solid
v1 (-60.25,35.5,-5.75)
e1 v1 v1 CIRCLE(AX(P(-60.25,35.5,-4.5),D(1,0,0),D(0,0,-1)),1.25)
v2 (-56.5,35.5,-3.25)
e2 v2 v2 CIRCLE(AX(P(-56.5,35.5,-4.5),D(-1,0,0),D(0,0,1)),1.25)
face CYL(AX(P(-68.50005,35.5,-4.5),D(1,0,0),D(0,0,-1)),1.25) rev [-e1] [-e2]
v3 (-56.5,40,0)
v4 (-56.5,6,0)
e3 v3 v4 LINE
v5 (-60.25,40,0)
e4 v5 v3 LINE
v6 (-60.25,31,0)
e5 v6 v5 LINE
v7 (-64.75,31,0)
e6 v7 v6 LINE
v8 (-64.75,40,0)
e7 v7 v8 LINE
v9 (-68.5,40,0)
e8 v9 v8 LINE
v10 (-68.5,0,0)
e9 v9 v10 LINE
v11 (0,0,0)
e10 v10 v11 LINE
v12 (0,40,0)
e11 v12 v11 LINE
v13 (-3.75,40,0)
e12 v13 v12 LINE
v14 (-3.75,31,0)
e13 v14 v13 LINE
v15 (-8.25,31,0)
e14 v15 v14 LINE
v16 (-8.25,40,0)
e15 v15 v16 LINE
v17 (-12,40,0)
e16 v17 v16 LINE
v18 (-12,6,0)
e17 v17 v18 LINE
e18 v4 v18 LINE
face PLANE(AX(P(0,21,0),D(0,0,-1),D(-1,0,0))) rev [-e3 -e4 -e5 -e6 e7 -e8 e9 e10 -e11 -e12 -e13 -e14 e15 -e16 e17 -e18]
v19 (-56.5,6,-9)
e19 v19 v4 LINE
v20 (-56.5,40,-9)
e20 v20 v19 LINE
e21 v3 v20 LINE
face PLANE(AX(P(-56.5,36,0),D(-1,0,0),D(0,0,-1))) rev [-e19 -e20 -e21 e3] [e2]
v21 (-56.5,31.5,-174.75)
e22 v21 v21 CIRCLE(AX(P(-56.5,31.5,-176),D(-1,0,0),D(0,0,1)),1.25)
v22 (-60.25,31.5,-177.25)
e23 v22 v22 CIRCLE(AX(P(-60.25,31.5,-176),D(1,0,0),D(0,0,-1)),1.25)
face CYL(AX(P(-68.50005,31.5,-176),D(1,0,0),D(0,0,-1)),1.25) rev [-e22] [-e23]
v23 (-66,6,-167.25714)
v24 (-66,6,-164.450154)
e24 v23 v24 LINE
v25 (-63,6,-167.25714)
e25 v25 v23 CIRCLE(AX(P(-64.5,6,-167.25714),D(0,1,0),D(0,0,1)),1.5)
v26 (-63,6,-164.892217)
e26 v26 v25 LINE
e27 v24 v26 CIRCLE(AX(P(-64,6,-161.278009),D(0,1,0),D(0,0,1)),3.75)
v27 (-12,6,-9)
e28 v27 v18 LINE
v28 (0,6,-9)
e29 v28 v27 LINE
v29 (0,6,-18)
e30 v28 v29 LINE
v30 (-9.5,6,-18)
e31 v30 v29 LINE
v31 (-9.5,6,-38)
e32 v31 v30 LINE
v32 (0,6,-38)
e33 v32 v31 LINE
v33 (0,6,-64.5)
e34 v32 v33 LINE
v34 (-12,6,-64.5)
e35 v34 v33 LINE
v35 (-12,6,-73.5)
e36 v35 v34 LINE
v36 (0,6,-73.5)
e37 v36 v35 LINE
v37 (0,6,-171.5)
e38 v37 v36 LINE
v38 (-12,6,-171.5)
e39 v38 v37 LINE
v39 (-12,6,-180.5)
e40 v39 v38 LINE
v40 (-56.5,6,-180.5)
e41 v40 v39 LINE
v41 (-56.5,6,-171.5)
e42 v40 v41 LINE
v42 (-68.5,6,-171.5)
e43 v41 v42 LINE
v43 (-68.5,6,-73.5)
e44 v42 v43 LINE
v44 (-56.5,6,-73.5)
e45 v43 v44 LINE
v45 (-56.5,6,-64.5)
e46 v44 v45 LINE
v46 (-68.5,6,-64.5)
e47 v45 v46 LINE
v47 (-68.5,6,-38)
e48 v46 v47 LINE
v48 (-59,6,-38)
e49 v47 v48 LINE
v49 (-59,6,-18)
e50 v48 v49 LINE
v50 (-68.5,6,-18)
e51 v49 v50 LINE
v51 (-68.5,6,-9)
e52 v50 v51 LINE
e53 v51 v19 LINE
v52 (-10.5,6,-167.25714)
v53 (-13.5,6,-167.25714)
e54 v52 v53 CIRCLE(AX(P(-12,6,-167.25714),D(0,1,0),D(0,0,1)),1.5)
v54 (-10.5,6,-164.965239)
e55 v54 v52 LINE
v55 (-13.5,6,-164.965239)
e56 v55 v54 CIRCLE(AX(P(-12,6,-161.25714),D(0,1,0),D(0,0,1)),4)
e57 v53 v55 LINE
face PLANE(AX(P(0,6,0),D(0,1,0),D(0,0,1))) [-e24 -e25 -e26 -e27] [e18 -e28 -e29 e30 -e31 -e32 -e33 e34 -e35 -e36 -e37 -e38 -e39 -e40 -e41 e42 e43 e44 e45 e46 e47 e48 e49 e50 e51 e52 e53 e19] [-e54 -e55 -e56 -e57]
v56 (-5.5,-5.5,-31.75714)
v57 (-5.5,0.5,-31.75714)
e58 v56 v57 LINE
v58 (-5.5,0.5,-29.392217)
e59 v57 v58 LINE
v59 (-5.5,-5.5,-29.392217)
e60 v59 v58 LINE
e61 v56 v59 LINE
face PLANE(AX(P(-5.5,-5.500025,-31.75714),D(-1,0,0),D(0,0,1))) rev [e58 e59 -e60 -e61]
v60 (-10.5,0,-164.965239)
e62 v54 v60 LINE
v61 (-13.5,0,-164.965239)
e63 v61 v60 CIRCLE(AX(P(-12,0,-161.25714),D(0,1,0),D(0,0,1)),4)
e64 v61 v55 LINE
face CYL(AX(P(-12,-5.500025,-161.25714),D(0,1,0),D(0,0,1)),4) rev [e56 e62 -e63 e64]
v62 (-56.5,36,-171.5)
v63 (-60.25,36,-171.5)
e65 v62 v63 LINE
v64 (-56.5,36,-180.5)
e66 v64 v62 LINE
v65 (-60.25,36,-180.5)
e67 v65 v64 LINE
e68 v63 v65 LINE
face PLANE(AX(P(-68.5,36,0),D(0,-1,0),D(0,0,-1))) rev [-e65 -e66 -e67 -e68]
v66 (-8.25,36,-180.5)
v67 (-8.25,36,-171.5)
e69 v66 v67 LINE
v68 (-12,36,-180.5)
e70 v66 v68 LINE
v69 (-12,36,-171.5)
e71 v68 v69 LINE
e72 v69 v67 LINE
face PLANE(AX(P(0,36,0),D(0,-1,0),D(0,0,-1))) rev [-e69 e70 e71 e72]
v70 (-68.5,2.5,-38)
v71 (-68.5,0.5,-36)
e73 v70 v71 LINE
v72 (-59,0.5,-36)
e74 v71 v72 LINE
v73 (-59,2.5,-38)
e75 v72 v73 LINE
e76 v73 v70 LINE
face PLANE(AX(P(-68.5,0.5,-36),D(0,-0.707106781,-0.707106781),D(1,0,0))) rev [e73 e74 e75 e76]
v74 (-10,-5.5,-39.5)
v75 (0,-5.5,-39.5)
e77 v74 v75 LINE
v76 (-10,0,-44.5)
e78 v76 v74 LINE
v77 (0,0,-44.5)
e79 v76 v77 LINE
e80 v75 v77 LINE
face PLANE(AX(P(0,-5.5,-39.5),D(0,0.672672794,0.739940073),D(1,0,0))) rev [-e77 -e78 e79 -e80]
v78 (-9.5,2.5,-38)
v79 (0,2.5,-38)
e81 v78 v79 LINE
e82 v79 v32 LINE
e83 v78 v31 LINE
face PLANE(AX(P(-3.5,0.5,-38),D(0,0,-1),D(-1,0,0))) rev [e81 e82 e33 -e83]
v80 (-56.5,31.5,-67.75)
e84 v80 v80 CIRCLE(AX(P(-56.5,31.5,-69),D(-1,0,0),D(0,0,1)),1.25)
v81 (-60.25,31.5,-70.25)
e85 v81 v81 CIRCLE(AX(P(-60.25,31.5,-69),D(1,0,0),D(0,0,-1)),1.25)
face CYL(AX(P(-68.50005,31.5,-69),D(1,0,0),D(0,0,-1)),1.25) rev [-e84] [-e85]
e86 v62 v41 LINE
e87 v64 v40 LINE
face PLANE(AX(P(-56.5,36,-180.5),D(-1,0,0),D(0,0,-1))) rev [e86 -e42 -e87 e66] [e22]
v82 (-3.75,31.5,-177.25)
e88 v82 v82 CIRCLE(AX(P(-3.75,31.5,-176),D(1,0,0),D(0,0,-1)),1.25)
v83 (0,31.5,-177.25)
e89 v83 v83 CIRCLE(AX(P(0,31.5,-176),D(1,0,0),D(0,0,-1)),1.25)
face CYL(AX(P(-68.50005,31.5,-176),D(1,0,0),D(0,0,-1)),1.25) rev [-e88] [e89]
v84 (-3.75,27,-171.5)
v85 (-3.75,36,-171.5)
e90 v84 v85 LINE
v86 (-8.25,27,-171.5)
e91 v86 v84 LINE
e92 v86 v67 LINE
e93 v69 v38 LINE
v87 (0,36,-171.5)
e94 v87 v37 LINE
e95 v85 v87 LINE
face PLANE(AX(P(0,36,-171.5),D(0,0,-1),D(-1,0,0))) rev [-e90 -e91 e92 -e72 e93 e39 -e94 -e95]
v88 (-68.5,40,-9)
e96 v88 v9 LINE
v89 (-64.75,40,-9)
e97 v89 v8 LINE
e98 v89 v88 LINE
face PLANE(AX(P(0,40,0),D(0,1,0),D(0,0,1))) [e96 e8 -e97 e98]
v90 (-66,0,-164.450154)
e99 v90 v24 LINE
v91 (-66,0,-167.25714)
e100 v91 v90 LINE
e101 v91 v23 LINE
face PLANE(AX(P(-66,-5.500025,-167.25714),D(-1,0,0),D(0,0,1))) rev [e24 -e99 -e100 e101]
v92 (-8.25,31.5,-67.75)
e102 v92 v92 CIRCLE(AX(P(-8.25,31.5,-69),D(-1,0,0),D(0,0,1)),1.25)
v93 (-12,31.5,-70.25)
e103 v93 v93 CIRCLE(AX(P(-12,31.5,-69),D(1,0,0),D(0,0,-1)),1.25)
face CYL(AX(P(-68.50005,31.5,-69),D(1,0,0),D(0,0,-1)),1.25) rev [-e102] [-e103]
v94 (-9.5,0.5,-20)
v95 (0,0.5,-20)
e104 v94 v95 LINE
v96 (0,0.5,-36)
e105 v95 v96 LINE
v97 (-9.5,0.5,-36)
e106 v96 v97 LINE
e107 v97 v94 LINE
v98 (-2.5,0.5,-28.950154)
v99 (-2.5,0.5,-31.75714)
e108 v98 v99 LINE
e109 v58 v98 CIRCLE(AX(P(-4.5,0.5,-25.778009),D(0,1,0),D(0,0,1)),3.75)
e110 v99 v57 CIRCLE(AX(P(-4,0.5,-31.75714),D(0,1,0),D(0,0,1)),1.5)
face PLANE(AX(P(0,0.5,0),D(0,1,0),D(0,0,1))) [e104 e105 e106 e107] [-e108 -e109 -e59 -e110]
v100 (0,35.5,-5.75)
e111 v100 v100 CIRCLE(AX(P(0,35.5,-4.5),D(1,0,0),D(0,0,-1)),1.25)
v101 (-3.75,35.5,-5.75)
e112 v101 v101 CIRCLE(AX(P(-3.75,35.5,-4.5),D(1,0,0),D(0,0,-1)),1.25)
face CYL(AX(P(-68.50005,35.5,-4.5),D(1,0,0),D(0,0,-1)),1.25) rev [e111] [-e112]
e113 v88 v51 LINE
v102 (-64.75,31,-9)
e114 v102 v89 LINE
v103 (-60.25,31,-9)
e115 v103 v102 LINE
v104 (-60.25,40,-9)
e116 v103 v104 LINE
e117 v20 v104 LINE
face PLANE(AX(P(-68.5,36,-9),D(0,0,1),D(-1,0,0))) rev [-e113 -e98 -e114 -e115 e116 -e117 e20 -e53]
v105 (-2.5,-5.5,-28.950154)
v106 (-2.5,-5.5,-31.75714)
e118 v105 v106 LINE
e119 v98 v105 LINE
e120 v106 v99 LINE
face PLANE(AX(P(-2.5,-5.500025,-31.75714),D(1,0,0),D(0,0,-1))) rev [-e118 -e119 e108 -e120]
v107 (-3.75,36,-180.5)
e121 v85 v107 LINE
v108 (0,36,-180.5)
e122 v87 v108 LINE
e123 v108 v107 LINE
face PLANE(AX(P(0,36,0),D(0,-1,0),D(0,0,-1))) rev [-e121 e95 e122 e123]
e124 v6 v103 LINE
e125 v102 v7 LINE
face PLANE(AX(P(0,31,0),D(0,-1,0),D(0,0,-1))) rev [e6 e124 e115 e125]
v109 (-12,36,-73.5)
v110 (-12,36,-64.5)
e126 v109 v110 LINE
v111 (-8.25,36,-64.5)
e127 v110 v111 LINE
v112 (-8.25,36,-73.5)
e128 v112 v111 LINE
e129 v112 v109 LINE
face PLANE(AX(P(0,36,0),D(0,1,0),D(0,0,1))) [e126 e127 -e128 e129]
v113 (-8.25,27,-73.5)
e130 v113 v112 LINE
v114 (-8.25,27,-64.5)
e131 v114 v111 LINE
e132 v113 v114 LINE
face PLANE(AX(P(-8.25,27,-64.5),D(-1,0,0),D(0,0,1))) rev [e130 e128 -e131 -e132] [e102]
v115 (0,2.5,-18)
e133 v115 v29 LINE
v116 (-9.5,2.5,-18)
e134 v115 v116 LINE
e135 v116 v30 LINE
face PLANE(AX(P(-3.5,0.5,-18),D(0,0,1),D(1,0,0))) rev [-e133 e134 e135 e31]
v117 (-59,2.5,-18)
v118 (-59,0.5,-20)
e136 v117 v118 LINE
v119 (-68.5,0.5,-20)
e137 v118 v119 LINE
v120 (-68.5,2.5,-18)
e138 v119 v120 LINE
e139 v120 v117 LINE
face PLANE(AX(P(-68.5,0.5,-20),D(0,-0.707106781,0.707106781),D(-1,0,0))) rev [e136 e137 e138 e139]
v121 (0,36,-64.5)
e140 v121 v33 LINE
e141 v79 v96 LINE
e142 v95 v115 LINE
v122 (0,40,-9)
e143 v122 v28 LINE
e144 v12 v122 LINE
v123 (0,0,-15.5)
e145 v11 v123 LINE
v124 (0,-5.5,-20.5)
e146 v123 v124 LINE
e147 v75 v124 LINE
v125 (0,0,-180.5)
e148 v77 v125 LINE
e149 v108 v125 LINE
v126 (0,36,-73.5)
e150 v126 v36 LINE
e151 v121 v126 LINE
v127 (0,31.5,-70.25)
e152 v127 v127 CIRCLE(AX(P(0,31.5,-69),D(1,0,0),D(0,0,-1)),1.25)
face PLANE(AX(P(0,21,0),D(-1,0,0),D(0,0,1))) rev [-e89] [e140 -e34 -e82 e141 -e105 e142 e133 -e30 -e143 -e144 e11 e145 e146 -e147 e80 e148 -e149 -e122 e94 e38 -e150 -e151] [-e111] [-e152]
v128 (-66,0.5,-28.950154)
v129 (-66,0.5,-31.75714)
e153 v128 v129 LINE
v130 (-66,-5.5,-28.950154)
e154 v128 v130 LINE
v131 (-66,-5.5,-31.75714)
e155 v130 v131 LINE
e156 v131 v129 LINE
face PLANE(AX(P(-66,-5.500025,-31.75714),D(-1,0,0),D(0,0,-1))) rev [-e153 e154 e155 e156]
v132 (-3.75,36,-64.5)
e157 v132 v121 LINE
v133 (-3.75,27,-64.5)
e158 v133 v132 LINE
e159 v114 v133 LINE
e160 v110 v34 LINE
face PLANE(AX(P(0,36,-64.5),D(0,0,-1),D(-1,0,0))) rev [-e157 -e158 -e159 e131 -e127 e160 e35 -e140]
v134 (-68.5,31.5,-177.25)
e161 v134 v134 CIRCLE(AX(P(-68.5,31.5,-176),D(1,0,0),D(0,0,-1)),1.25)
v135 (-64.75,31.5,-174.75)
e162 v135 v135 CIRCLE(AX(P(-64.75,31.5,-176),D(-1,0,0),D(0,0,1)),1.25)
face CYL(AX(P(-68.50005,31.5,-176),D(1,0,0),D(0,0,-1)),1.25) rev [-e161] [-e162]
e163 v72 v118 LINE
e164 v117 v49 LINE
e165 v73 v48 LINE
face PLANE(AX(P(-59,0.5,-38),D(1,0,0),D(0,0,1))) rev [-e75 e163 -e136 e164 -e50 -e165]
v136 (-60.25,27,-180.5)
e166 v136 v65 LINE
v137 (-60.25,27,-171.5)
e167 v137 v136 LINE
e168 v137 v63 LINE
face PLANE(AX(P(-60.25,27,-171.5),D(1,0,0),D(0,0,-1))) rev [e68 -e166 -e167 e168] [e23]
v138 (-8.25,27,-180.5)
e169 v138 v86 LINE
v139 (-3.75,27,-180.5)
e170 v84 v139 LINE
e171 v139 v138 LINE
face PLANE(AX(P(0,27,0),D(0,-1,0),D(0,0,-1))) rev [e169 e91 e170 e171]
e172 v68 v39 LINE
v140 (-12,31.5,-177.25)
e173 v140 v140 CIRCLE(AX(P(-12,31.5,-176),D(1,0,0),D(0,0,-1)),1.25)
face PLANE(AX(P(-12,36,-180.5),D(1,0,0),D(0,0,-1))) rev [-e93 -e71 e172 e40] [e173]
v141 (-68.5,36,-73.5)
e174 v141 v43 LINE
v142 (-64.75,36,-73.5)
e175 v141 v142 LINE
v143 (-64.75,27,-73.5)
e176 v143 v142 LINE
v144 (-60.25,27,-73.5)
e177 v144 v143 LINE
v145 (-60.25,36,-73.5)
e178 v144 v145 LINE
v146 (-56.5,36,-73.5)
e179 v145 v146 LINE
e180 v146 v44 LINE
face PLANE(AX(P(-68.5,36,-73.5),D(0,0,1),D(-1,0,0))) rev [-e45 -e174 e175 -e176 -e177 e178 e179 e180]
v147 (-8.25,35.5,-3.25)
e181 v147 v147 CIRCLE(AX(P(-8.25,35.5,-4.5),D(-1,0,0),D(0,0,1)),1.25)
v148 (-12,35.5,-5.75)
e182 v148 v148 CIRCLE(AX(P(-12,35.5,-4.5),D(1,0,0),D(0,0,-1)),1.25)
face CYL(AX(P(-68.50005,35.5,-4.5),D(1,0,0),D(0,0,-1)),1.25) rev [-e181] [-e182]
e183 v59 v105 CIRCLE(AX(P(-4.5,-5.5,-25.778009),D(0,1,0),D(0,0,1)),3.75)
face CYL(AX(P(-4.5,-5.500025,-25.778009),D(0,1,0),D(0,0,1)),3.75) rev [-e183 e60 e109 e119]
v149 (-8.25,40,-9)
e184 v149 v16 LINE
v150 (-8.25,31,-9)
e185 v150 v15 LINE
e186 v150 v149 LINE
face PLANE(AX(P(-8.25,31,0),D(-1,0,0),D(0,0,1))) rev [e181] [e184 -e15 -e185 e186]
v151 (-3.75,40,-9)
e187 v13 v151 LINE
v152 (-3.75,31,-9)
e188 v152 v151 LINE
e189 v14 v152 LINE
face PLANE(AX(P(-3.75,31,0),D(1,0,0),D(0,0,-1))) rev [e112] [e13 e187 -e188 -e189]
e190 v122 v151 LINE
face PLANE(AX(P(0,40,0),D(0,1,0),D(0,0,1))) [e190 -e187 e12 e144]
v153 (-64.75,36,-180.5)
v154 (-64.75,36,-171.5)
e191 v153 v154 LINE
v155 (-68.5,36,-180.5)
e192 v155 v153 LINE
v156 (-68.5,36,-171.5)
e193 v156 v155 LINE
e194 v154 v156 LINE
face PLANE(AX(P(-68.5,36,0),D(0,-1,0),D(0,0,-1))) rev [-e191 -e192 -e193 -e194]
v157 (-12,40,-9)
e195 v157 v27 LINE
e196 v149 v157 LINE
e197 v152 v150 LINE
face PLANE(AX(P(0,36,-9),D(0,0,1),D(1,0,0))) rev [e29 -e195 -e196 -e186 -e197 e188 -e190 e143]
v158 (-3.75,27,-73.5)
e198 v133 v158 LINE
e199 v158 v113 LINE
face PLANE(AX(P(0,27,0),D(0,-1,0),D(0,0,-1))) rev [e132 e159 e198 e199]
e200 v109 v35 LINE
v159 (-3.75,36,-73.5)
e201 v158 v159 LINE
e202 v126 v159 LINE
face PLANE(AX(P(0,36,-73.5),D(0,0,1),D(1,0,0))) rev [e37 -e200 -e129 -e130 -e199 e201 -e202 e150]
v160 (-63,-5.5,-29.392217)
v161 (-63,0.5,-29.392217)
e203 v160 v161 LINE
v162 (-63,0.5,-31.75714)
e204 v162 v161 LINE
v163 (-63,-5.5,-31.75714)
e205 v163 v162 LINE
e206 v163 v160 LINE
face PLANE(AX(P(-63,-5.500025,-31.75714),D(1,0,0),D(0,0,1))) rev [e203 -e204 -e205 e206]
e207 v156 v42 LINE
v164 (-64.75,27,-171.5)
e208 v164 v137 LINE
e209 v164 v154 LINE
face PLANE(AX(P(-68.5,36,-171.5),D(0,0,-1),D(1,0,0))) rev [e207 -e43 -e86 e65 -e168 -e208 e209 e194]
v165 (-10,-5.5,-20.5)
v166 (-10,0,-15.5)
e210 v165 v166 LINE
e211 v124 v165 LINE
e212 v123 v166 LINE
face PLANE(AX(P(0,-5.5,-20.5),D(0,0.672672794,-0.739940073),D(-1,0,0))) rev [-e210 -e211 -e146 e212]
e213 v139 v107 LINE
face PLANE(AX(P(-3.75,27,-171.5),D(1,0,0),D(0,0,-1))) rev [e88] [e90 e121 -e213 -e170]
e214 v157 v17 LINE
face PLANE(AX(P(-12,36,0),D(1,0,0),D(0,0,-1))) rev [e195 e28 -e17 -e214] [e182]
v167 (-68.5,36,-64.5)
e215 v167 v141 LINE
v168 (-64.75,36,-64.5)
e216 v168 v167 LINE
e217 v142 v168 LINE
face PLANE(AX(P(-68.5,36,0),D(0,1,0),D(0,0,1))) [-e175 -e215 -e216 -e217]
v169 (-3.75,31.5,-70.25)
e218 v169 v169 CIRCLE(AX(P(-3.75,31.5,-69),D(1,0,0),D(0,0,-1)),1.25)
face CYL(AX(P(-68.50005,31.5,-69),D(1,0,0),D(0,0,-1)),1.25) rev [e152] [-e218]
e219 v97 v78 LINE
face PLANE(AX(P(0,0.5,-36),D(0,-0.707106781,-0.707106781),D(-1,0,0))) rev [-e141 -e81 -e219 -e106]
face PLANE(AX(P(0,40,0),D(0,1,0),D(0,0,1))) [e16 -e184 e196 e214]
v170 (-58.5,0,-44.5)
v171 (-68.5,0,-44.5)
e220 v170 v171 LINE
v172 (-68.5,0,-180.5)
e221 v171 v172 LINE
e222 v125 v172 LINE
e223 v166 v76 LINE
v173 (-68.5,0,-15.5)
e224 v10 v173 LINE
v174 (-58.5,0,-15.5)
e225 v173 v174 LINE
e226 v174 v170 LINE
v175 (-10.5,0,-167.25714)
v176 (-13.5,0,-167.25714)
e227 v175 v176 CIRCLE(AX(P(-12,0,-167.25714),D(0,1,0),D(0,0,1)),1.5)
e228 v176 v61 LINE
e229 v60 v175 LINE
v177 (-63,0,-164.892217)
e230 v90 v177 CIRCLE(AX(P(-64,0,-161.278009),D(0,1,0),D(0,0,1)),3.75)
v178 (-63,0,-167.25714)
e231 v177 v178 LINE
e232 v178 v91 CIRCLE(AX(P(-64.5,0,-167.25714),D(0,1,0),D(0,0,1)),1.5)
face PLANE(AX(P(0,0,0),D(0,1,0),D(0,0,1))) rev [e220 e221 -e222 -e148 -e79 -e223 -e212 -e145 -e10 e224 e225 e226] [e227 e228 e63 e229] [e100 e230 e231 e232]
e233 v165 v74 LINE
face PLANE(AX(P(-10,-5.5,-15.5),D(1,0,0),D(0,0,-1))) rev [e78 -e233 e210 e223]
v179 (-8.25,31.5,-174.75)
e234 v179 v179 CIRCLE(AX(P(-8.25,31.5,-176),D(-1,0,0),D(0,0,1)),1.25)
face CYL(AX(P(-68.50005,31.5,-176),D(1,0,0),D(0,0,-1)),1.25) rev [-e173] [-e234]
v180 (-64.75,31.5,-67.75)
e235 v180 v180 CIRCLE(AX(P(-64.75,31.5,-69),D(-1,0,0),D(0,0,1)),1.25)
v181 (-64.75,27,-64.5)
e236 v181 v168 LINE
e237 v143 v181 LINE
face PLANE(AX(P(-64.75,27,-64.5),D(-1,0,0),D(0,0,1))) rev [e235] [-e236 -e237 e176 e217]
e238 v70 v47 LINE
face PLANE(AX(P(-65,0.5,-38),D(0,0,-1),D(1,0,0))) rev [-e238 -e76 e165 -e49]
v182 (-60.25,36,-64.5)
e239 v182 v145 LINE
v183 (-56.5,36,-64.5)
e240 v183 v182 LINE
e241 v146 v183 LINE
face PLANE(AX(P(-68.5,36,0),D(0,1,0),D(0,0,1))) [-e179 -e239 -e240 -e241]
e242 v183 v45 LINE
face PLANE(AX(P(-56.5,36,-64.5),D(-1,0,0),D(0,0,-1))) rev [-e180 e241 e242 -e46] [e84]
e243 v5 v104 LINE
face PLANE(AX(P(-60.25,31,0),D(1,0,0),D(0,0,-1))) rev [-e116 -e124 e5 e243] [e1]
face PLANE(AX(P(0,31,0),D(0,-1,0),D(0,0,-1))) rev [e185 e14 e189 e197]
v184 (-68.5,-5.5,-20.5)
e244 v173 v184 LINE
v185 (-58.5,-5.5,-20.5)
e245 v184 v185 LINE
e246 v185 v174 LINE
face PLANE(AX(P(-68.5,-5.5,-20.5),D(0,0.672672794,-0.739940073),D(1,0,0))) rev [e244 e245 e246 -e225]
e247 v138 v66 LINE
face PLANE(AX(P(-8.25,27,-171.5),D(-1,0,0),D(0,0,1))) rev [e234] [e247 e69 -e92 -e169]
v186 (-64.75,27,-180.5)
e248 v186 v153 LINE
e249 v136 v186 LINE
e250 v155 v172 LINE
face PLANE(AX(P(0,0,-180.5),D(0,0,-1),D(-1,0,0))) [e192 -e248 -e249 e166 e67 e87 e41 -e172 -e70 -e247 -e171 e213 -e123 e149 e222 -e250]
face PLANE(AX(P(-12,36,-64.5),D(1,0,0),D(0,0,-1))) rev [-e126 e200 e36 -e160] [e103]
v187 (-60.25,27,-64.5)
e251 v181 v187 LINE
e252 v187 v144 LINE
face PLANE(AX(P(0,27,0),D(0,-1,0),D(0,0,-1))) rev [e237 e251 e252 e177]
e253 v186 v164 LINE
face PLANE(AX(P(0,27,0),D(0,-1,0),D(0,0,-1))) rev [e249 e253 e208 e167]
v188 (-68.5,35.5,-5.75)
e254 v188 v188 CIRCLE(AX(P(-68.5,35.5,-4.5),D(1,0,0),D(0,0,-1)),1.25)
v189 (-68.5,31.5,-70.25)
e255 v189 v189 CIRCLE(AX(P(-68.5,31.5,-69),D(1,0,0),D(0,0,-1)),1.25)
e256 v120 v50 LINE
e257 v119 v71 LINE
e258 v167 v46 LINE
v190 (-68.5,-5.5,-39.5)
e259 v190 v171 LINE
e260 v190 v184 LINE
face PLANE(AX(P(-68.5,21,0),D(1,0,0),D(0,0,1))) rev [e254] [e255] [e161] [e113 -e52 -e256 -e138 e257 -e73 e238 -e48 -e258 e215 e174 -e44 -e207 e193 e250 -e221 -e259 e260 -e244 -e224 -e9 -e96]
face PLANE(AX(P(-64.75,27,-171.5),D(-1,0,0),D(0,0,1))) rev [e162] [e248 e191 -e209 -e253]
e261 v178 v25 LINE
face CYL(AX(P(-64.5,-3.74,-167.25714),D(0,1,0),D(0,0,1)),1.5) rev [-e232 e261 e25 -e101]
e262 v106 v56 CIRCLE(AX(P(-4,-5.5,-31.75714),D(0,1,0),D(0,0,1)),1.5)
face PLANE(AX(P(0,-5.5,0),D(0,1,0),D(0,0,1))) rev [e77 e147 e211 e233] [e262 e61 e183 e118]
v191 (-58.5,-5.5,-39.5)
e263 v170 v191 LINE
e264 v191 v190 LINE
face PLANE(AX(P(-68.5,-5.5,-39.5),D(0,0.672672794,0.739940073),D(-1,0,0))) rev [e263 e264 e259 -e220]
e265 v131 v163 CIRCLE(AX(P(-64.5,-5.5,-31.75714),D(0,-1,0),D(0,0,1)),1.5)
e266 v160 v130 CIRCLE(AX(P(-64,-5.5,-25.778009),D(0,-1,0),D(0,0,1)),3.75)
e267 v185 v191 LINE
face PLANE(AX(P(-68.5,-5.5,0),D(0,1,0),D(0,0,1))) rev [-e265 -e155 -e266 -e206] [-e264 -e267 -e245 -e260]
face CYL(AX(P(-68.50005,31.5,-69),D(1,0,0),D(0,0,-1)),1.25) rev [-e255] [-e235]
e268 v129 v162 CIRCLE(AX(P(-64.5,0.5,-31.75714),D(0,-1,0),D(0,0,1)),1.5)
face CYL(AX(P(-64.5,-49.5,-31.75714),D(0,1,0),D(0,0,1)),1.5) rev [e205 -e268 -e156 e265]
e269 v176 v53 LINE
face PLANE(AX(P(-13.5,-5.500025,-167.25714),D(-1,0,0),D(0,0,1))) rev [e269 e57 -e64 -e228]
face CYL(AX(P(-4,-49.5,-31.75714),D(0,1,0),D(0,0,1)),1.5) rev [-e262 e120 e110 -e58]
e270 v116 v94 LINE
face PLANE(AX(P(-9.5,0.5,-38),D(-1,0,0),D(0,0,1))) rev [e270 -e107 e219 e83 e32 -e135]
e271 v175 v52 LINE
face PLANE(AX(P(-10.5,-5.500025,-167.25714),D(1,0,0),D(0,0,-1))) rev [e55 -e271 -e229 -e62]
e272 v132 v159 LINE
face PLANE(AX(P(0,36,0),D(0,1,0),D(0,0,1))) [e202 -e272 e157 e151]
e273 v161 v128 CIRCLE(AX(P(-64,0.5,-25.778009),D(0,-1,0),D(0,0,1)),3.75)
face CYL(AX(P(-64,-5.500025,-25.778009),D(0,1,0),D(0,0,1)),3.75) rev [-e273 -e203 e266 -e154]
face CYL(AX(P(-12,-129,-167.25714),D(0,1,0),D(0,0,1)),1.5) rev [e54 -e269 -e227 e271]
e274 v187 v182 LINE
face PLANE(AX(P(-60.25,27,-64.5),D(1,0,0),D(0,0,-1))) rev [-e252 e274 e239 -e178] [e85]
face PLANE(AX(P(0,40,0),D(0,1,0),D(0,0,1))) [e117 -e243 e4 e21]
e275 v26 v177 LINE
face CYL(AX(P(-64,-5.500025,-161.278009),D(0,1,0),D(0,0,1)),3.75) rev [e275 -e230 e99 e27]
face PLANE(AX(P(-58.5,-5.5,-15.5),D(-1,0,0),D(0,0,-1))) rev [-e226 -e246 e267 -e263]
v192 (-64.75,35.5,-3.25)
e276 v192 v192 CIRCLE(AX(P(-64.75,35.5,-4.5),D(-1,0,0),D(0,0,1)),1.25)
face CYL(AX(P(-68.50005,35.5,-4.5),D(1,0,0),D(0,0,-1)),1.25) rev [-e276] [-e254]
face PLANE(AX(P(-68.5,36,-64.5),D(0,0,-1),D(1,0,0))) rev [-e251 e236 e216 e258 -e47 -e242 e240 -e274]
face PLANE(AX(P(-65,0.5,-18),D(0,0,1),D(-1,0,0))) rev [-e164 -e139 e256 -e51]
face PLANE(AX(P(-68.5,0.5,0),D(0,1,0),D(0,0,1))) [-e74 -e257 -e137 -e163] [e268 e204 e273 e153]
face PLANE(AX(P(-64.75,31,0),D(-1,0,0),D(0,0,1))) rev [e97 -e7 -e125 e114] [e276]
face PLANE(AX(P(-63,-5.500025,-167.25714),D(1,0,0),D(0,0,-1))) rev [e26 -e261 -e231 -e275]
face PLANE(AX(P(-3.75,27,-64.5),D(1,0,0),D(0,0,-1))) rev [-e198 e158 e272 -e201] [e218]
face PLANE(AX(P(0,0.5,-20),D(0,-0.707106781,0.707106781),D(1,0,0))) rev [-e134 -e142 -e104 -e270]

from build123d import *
from OCP.BRepFilletAPI import BRepFilletAPI_MakeChamfer

# Parameters (mm, degrees)
SKETCH1_W           = 68.5
SKETCH1_H           = 64.5
BOSS_EXTRUDE3_DEPTH = 21
SKETCH3_W           = 61.5
SKETCH3_H           = 61
CUT_EXTRUDE1_DEPTH  = 15
SKETCH5_W           = 68.5
SKETCH5_H           = 6
BOSS_EXTRUDE4_DEPTH = 105
SKETCH10_W          = 10
SKETCH10_H          = 29
BOSS_EXTRUDE5_DEPTH = 5.5
SKETCH9_W           = 3.5
SKETCH9_H           = 20
CUT_EXTRUDE2_DEPTH  = 20.5
SKETCH11_W          = 6
SKETCH11_H          = 20
CUT_EXTRUDE3_DEPTH  = 5.5
CHAMFER2_SIZE       = 5.5
CHAMFER2_SIZE_2     = 5
CHAMFER3_SIZE       = 2
SKETCH12_W          = 34.25
SKETCH12_H          = 169.5
CUT_EXTRUDE4_DEPTH  = 50
SKETCH15_R          = 1.5
CUT_EXTRUDE5_DEPTH  = 50
SKETCH19_W          = 34.25
SKETCH19_H          = 6
BOSS_EXTRUDE6_DEPTH = 11
SKETCH26_W          = 12
SKETCH26_H          = 9
BOSS_EXTRUDE7_DEPTH = 30
SKETCH20_R          = 3.75
CUT_EXTRUDE9_DEPTH  = 188.119113134
SKETCH21_W          = 3
SKETCH21_H          = 2.806985986
CUT_EXTRUDE10_DEPTH = 188.119113134
SKETCH18_R          = 1.5
CUT_EXTRUDE8_DEPTH  = 135
SKETCH24_R          = 4
CUT_EXTRUDE13_DEPTH = 196.377839071
SKETCH25_W          = 3
SKETCH25_H          = 3.218590937
CUT_EXTRUDE14_DEPTH = 196.377839071
SKETCH33_R          = 1.5
CUT_EXTRUDE17_DEPTH = 9.74
SKETCH34_R          = 3.75
CUT_EXTRUDE18_DEPTH = 196.377839071
SKETCH39_W          = 3
SKETCH39_H          = 4.471117771
CUT_EXTRUDE22_DEPTH = 196.377839071
CUT_EXTRUDE23_DEPTH = 15
SKETCH41_W          = 4.5
SKETCH41_H          = 9
CUT_EXTRUDE24_DEPTH = 9
SKETCH42_R          = 1.25
CUT_EXTRUDE25_DEPTH = 197.388645293
SKETCH43_W          = 12
SKETCH43_H          = 9
BOSS_EXTRUDE8_DEPTH = 4
SKETCH44_W          = 4.5
SKETCH44_H          = 9
CUT_EXTRUDE26_DEPTH = 9
SKETCH45_R          = 1.25
CUT_EXTRUDE27_DEPTH = 198.16110164


with BuildPart() as part:
    # Sketch1 → Boss-Extrude3 (new body)
    with BuildSketch(Plane(origin=(0, 0, 0), x_dir=(1, 0, 0), z_dir=(0, 1, 0))):
        with Locations((-34.25, 32.25)):
            Rectangle(SKETCH1_W, SKETCH1_H)
    extrude(amount=BOSS_EXTRUDE3_DEPTH)

    # Sketch3 → Cut-Extrude1 (cut)
    with BuildSketch(Plane(origin=(0, 21, 0), x_dir=(1, 0, 0), z_dir=(0, 1, 0))):
        with Locations((-34.25, 34)):
            Rectangle(SKETCH3_W, SKETCH3_H)
    extrude(amount=-CUT_EXTRUDE1_DEPTH, mode=Mode.SUBTRACT)

    # Sketch5 → Boss-Extrude4 (add)
    with BuildSketch(Plane(origin=(0, 0, -64.5), x_dir=(-1, 0, 0), z_dir=(0, 0, -1))):
        with Locations((34.25, 3)):
            Rectangle(SKETCH5_W, SKETCH5_H)
    extrude(amount=BOSS_EXTRUDE4_DEPTH)

    # Sketch10 → Boss-Extrude5 (add)
    with BuildSketch(Plane.XZ):
        with Locations((-5, -30)):
            Rectangle(SKETCH10_W, SKETCH10_H)
    extrude(amount=BOSS_EXTRUDE5_DEPTH)

    # Sketch9 → Cut-Extrude2 (cut)
    with BuildSketch(Plane(origin=(0, 21, 0), x_dir=(1, 0, 0), z_dir=(0, 1, 0))):
        with Locations((-1.75, 28)):
            Rectangle(SKETCH9_W, SKETCH9_H)
    extrude(amount=-CUT_EXTRUDE2_DEPTH, mode=Mode.SUBTRACT)

    # Sketch11 → Cut-Extrude3 (cut)
    with BuildSketch(Plane(origin=(0, 6, 0), x_dir=(1, 0, 0), z_dir=(0, 1, 0))):
        with Locations((-6.5, 28)):
            Rectangle(SKETCH11_W, SKETCH11_H)
    extrude(amount=-CUT_EXTRUDE3_DEPTH, mode=Mode.SUBTRACT)

    # Chamfer2
    chamfer2_edges_1 = [part.edges().sort_by_distance(p)[0] for p in [
        (-5, -5.5, -44.5),
    ]]
    chamfer2_side_1 = [part.faces().sort_by_distance(p)[0] for p in [
        (-5, -5.4, -44.5),
    ]]
    chamfer2_edges_2 = [part.edges().sort_by_distance(p)[0] for p in [
        (-5, -5.5, -15.5),
    ]]
    chamfer2_side_2 = [part.faces().sort_by_distance(p)[0] for p in [
        (-5, -5.5, -15.6),
    ]]
    chamfer2 = BRepFilletAPI_MakeChamfer(part.part.solid().wrapped)
    for e in chamfer2_edges_1:
        chamfer2.Add(CHAMFER2_SIZE - 0.0001, CHAMFER2_SIZE_2 - 0.0001, e.wrapped, chamfer2_side_1[0].wrapped)
    for e in chamfer2_edges_2:
        chamfer2.Add(CHAMFER2_SIZE_2 - 0.0001, CHAMFER2_SIZE - 0.0001, e.wrapped, chamfer2_side_2[0].wrapped)
    add(Compound.cast(chamfer2.Shape()), mode=Mode.REPLACE)  # a hair under: the kernel refuses the full size

    # Chamfer3
    chamfer3_edges = [part.edges().sort_by_distance(p)[0] for p in [
        (-4.75, 0.5, -38),
        (-4.75, 0.5, -18),
    ]]
    chamfer(chamfer3_edges, length=CHAMFER3_SIZE)

    # Sketch12 → Cut-Extrude4 (cut)
    with BuildSketch(Plane(origin=(0, 21, 0), x_dir=(1, 0, 0), z_dir=(0, 1, 0))):
        with Locations((-51.375, 84.75)):
            Rectangle(SKETCH12_W, SKETCH12_H)
    extrude(amount=-CUT_EXTRUDE4_DEPTH, mode=Mode.SUBTRACT)

    # Sketch15 → Cut-Extrude5 (cut)
    with BuildSketch(Plane(origin=(0, 0.5, 0), x_dir=(1, 0, 0), z_dir=(0, 1, 0))):
        with Locations(Location((-4, 31.75713966, 0), (0, 0, 270))):
            Circle(SKETCH15_R)
    extrude(amount=-CUT_EXTRUDE5_DEPTH, mode=Mode.SUBTRACT)

    # Sketch19 → Boss-Extrude6 (add)
    with BuildSketch(Plane(origin=(0, 0, -169.5), x_dir=(-1, 0, 0), z_dir=(0, 0, -1))):
        with Locations((17.125, 3)):
            Rectangle(SKETCH19_W, SKETCH19_H)
    extrude(amount=BOSS_EXTRUDE6_DEPTH)

    # Sketch26 → Boss-Extrude7 (add)
    with BuildSketch(Plane(origin=(0, 6, 0), x_dir=(1, 0, 0), z_dir=(0, 1, 0))):
        with Locations((-6, 69)):
            Rectangle(SKETCH26_W, SKETCH26_H)
        with Locations((-6, 4.5)):
            Rectangle(SKETCH26_W, SKETCH26_H)
        with Locations((-6, 176)):
            Rectangle(SKETCH26_W, SKETCH26_H)
    extrude(amount=BOSS_EXTRUDE7_DEPTH)

    # Sketch20 → Cut-Extrude9 (cut, through all)
    with BuildSketch(Plane(origin=(0, 0.5, 0), x_dir=(1, 0, 0), z_dir=(0, 1, 0))):
        with Locations(Location((-4.5, 25.778009288, 0), (0, 0, 270))):
            Circle(SKETCH20_R)
    extrude(amount=-CUT_EXTRUDE9_DEPTH, mode=Mode.SUBTRACT)

    # Sketch21 → Cut-Extrude10 (cut, through all)
    with BuildSketch(Plane(origin=(0, 0.5, 0), x_dir=(1, 0, 0), z_dir=(0, 1, 0))):
        with Locations((-4, 30.353646667)):
            Rectangle(SKETCH21_W, SKETCH21_H)
    extrude(amount=-CUT_EXTRUDE10_DEPTH, mode=Mode.SUBTRACT)

    # Mirror5: part across plane


with BuildPart() as part_1:
    add(part.part)
    add(part.part.mirror(Plane(origin=(-34.25, 0, 0), x_dir=(0, 0, 1), z_dir=(1, 0, 0))))

    # Sketch18 → Cut-Extrude8 (cut)
    with BuildSketch(Plane(origin=(0, 6, 0), x_dir=(1, 0, 0), z_dir=(0, 1, 0))):
        with Locations(Location((-12, 167.25713966, 0), (0, 0, 270))):
            Circle(SKETCH18_R)
    extrude(amount=-CUT_EXTRUDE8_DEPTH, mode=Mode.SUBTRACT)

    # Sketch24 → Cut-Extrude13 (cut, through all)
    with BuildSketch(Plane(origin=(0, 6, 0), x_dir=(1, 0, 0), z_dir=(0, 1, 0))):
        with Locations(Location((-12, 161.25713966, 0), (0, 0, 270))):
            Circle(SKETCH24_R)
    extrude(amount=-CUT_EXTRUDE13_DEPTH, mode=Mode.SUBTRACT)

    # Sketch25 → Cut-Extrude14 (cut, through all)
    with BuildSketch(Plane(origin=(0, 6, 0), x_dir=(1, 0, 0), z_dir=(0, 1, 0))):
        with Locations((-12, 165.647844192)):
            Rectangle(SKETCH25_W, SKETCH25_H)
    extrude(amount=-CUT_EXTRUDE14_DEPTH, mode=Mode.SUBTRACT)

    # Sketch33 → Cut-Extrude17 (cut)
    with BuildSketch(Plane(origin=(0, 6, 0), x_dir=(1, 0, 0), z_dir=(0, 1, 0))):
        with Locations(Location((-64.5, 167.25713966, 0), (0, 0, 270))):
            Circle(SKETCH33_R)
        with Locations((-64.5, 31.75713966)):
            Circle(SKETCH33_R)
        with Locations((-12, 167.25713966)):
            Circle(SKETCH33_R)
    extrude(amount=-CUT_EXTRUDE17_DEPTH, mode=Mode.SUBTRACT)

    # Sketch34 → Cut-Extrude18 (cut, through all)
    with BuildSketch(Plane(origin=(0, 6, 0), x_dir=(1, 0, 0), z_dir=(0, 1, 0))):
        with Locations(Location((-64, 161.278009288, 0), (0, 0, 270))):
            Circle(SKETCH34_R)
    extrude(amount=-CUT_EXTRUDE18_DEPTH, mode=Mode.SUBTRACT)

    # Sketch39 → Cut-Extrude22 (cut, through all)
    with BuildSketch(Plane(origin=(0, 6, 0), x_dir=(1, 0, 0), z_dir=(0, 1, 0))):
        with Locations((-64.5, 165.021580775)):
            Rectangle(SKETCH39_W, SKETCH39_H)
    extrude(amount=-CUT_EXTRUDE22_DEPTH, mode=Mode.SUBTRACT)

    # Sketch40 → Cut-Extrude23 (cut)
    with BuildSketch(Plane(origin=(0, 21, 0), x_dir=(1, 0, 0), z_dir=(0, 1, 0))):
        Polygon((-68.5, 64.5), (-68.5, 9), (-56.5, 9), (-56.5, 0), (-12, 0), (-12, 9), (0, 9), (0, 64.5), align=None)
    extrude(amount=-CUT_EXTRUDE23_DEPTH, mode=Mode.SUBTRACT)

    # Sketch41 → Cut-Extrude24 (cut)
    with BuildSketch(Plane(origin=(0, 36, 0), x_dir=(1, 0, 0), z_dir=(0, 1, 0))):
        with Locations((-62.5, 69)):
            Rectangle(SKETCH41_W, SKETCH41_H)
        with Locations((-62.5, 176)):
            Rectangle(SKETCH41_W, SKETCH41_H)
        with Locations((-6, 69)):
            Rectangle(SKETCH41_W, SKETCH41_H)
        with Locations((-6, 176)):
            Rectangle(SKETCH41_W, SKETCH41_H)
    extrude(amount=-CUT_EXTRUDE24_DEPTH, mode=Mode.SUBTRACT)

    # Sketch42 → Cut-Extrude25 (cut, through all)
    with BuildSketch(Plane(origin=(0, 0, 0), x_dir=(0, 0, -1), z_dir=(1, 0, 0))):
        with Locations((69, 31.5)):
            Circle(SKETCH42_R)
        with Locations((176, 31.5)):
            Circle(SKETCH42_R)
    extrude(amount=-CUT_EXTRUDE25_DEPTH, mode=Mode.SUBTRACT)

    # Sketch43 → Boss-Extrude8 (add)
    with BuildSketch(Plane(origin=(0, 36, 0), x_dir=(1, 0, 0), z_dir=(0, 1, 0))):
        with Locations((-62.5, 4.5)):
            Rectangle(SKETCH43_W, SKETCH43_H)
        with Locations((-6, 4.5)):
            Rectangle(SKETCH43_W, SKETCH43_H)
    extrude(amount=BOSS_EXTRUDE8_DEPTH)

    # Sketch44 → Cut-Extrude26 (cut)
    with BuildSketch(Plane(origin=(0, 40, 0), x_dir=(1, 0, 0), z_dir=(0, 1, 0))):
        with Locations((-62.5, 4.5)):
            Rectangle(SKETCH44_W, SKETCH44_H)
        with Locations((-6, 4.5)):
            Rectangle(SKETCH44_W, SKETCH44_H)
    extrude(amount=-CUT_EXTRUDE26_DEPTH, mode=Mode.SUBTRACT)

    # Sketch45 → Cut-Extrude27 (cut, through all)
    with BuildSketch(Plane(origin=(0, 0, 0), x_dir=(0, 0, -1), z_dir=(1, 0, 0))):
        with Locations((4.5, 35.5)):
            Circle(SKETCH45_R)
    extrude(amount=-CUT_EXTRUDE27_DEPTH, mode=Mode.SUBTRACT)


solid = part_1.part
